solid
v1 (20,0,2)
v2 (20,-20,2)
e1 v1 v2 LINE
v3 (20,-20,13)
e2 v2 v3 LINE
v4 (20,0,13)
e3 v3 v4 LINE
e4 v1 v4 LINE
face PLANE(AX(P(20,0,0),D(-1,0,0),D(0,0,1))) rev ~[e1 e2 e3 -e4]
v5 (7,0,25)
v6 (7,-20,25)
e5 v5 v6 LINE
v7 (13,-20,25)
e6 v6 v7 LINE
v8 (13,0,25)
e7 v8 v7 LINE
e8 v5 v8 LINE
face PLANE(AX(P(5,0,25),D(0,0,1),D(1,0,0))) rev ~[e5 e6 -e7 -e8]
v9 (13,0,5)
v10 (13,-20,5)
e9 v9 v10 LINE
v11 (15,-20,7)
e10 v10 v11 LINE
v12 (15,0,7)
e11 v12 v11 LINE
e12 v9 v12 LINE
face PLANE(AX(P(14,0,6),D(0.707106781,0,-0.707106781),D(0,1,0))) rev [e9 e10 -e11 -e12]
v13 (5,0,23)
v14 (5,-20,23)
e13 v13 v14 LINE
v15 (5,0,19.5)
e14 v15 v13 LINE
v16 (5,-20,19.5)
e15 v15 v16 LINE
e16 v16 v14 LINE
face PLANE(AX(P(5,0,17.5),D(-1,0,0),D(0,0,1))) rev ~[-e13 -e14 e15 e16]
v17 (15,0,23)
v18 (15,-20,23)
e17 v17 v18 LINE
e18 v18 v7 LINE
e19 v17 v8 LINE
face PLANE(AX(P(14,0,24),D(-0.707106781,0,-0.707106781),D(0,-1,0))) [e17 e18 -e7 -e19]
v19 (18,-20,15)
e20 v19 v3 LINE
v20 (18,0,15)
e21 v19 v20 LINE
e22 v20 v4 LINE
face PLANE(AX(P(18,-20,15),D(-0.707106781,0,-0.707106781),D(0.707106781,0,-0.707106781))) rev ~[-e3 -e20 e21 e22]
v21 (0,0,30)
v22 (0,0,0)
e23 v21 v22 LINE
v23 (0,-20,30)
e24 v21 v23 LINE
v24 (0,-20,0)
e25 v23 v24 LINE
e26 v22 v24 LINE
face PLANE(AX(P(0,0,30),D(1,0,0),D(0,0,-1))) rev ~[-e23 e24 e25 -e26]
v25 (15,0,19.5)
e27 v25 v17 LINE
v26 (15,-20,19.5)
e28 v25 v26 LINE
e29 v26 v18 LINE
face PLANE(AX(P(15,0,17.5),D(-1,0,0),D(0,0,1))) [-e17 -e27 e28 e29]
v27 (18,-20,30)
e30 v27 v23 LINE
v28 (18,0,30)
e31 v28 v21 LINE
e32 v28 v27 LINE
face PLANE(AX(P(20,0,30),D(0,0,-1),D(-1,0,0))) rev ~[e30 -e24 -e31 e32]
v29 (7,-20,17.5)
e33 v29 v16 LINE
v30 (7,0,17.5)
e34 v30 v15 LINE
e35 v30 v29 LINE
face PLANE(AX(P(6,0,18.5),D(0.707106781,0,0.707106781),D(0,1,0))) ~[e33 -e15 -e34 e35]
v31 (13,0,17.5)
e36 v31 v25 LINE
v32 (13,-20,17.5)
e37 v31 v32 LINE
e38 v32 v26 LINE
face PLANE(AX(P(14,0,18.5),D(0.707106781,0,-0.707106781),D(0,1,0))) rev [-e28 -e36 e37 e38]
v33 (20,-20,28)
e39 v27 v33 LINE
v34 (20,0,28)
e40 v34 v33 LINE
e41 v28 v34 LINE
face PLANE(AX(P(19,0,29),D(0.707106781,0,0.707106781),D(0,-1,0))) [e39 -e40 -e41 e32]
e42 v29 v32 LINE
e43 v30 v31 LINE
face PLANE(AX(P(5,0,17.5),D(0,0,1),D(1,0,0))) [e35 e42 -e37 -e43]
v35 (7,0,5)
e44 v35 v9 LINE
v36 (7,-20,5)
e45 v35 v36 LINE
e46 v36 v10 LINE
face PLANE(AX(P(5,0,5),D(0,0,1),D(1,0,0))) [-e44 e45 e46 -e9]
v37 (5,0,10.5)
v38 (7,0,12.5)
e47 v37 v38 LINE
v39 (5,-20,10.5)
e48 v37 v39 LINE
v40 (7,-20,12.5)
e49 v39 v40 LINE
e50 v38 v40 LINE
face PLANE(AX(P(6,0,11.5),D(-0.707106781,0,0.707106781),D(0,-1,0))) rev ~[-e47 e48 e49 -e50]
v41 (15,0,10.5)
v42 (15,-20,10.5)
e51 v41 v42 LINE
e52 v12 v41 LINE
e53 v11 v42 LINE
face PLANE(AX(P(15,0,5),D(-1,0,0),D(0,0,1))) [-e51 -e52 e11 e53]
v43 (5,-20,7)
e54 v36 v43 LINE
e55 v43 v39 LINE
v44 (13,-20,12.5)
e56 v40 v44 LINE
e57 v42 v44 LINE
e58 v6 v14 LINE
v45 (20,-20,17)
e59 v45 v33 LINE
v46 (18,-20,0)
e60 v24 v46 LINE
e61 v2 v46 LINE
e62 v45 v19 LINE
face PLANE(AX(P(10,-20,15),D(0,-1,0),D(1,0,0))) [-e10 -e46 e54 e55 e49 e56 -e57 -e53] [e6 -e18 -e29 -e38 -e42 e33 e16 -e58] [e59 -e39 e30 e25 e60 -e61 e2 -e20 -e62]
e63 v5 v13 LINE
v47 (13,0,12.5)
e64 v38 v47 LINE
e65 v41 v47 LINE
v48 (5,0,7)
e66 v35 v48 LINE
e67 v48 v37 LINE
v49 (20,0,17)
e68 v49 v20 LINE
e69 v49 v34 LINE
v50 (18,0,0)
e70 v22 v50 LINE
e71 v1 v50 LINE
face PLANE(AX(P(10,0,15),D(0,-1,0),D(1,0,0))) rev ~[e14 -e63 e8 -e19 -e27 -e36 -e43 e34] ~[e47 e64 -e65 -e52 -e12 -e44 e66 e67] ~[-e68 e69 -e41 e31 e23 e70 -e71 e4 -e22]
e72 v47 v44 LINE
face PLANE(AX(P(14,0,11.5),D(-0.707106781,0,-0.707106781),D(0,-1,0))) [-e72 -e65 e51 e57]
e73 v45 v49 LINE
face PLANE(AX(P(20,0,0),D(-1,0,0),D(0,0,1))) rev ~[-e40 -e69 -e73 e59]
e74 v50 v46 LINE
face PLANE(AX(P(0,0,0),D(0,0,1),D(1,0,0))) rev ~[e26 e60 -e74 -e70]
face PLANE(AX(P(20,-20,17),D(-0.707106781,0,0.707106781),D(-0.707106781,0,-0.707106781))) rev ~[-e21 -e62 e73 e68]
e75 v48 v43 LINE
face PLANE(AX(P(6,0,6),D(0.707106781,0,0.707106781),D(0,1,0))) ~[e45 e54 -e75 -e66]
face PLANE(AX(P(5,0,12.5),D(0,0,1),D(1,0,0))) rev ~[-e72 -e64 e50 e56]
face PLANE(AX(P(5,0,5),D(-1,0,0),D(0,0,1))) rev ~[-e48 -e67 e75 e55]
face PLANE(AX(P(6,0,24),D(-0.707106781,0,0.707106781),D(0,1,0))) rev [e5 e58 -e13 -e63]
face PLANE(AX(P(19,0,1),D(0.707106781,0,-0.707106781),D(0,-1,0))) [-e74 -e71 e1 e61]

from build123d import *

# Parameters (mm, degrees)
F0_W     = 10
F0_H     = 7.5
F1_DEPTH = 20
F2_SIZE  = 2
F4_DEPTH = 25


# Not quite as in the source:
# - a feature names something its author has since deleted; it is built from what else it names


with BuildPart() as f1:
    # F0 (on Front) → F1 (new body)
    with BuildSketch(Plane.XZ):
        Polygon((20, 30), (0, 30), (0, 0), (20, 0), (20, 15), align=None)
        with Locations((10, 8.75)):
            Rectangle(F0_W, F0_H, mode=Mode.SUBTRACT)
        with Locations((10, 21.25)):
            Rectangle(F0_W, F0_H, mode=Mode.SUBTRACT)
    extrude(amount=F1_DEPTH)

    # F2
    f2_edges = [f1.edges().sort_by_distance(p)[0] for p in [
        (20, -10, 30),
        (5, -10, 17.5),
        (5, -10, 25),
        (5, -10, 12.5),
        (5, -10, 5),
        (15, -10, 25),
        (15, -10, 17.5),
        (15, -10, 12.5),
        (15, -10, 5),
        (20, -10, 0),
    ]]
    chamfer(f2_edges, length=F2_SIZE)

    # F3 (on face) → F4 (cut)
    with BuildSketch(Plane.XZ.offset(20)):
        Polygon((20, 13), (20, 15), (18, 15), align=None)
        Polygon((18, 15), (20, 15), (20, 17), align=None)
    extrude(amount=-F4_DEPTH, mode=Mode.SUBTRACT)


solid = f1.part
